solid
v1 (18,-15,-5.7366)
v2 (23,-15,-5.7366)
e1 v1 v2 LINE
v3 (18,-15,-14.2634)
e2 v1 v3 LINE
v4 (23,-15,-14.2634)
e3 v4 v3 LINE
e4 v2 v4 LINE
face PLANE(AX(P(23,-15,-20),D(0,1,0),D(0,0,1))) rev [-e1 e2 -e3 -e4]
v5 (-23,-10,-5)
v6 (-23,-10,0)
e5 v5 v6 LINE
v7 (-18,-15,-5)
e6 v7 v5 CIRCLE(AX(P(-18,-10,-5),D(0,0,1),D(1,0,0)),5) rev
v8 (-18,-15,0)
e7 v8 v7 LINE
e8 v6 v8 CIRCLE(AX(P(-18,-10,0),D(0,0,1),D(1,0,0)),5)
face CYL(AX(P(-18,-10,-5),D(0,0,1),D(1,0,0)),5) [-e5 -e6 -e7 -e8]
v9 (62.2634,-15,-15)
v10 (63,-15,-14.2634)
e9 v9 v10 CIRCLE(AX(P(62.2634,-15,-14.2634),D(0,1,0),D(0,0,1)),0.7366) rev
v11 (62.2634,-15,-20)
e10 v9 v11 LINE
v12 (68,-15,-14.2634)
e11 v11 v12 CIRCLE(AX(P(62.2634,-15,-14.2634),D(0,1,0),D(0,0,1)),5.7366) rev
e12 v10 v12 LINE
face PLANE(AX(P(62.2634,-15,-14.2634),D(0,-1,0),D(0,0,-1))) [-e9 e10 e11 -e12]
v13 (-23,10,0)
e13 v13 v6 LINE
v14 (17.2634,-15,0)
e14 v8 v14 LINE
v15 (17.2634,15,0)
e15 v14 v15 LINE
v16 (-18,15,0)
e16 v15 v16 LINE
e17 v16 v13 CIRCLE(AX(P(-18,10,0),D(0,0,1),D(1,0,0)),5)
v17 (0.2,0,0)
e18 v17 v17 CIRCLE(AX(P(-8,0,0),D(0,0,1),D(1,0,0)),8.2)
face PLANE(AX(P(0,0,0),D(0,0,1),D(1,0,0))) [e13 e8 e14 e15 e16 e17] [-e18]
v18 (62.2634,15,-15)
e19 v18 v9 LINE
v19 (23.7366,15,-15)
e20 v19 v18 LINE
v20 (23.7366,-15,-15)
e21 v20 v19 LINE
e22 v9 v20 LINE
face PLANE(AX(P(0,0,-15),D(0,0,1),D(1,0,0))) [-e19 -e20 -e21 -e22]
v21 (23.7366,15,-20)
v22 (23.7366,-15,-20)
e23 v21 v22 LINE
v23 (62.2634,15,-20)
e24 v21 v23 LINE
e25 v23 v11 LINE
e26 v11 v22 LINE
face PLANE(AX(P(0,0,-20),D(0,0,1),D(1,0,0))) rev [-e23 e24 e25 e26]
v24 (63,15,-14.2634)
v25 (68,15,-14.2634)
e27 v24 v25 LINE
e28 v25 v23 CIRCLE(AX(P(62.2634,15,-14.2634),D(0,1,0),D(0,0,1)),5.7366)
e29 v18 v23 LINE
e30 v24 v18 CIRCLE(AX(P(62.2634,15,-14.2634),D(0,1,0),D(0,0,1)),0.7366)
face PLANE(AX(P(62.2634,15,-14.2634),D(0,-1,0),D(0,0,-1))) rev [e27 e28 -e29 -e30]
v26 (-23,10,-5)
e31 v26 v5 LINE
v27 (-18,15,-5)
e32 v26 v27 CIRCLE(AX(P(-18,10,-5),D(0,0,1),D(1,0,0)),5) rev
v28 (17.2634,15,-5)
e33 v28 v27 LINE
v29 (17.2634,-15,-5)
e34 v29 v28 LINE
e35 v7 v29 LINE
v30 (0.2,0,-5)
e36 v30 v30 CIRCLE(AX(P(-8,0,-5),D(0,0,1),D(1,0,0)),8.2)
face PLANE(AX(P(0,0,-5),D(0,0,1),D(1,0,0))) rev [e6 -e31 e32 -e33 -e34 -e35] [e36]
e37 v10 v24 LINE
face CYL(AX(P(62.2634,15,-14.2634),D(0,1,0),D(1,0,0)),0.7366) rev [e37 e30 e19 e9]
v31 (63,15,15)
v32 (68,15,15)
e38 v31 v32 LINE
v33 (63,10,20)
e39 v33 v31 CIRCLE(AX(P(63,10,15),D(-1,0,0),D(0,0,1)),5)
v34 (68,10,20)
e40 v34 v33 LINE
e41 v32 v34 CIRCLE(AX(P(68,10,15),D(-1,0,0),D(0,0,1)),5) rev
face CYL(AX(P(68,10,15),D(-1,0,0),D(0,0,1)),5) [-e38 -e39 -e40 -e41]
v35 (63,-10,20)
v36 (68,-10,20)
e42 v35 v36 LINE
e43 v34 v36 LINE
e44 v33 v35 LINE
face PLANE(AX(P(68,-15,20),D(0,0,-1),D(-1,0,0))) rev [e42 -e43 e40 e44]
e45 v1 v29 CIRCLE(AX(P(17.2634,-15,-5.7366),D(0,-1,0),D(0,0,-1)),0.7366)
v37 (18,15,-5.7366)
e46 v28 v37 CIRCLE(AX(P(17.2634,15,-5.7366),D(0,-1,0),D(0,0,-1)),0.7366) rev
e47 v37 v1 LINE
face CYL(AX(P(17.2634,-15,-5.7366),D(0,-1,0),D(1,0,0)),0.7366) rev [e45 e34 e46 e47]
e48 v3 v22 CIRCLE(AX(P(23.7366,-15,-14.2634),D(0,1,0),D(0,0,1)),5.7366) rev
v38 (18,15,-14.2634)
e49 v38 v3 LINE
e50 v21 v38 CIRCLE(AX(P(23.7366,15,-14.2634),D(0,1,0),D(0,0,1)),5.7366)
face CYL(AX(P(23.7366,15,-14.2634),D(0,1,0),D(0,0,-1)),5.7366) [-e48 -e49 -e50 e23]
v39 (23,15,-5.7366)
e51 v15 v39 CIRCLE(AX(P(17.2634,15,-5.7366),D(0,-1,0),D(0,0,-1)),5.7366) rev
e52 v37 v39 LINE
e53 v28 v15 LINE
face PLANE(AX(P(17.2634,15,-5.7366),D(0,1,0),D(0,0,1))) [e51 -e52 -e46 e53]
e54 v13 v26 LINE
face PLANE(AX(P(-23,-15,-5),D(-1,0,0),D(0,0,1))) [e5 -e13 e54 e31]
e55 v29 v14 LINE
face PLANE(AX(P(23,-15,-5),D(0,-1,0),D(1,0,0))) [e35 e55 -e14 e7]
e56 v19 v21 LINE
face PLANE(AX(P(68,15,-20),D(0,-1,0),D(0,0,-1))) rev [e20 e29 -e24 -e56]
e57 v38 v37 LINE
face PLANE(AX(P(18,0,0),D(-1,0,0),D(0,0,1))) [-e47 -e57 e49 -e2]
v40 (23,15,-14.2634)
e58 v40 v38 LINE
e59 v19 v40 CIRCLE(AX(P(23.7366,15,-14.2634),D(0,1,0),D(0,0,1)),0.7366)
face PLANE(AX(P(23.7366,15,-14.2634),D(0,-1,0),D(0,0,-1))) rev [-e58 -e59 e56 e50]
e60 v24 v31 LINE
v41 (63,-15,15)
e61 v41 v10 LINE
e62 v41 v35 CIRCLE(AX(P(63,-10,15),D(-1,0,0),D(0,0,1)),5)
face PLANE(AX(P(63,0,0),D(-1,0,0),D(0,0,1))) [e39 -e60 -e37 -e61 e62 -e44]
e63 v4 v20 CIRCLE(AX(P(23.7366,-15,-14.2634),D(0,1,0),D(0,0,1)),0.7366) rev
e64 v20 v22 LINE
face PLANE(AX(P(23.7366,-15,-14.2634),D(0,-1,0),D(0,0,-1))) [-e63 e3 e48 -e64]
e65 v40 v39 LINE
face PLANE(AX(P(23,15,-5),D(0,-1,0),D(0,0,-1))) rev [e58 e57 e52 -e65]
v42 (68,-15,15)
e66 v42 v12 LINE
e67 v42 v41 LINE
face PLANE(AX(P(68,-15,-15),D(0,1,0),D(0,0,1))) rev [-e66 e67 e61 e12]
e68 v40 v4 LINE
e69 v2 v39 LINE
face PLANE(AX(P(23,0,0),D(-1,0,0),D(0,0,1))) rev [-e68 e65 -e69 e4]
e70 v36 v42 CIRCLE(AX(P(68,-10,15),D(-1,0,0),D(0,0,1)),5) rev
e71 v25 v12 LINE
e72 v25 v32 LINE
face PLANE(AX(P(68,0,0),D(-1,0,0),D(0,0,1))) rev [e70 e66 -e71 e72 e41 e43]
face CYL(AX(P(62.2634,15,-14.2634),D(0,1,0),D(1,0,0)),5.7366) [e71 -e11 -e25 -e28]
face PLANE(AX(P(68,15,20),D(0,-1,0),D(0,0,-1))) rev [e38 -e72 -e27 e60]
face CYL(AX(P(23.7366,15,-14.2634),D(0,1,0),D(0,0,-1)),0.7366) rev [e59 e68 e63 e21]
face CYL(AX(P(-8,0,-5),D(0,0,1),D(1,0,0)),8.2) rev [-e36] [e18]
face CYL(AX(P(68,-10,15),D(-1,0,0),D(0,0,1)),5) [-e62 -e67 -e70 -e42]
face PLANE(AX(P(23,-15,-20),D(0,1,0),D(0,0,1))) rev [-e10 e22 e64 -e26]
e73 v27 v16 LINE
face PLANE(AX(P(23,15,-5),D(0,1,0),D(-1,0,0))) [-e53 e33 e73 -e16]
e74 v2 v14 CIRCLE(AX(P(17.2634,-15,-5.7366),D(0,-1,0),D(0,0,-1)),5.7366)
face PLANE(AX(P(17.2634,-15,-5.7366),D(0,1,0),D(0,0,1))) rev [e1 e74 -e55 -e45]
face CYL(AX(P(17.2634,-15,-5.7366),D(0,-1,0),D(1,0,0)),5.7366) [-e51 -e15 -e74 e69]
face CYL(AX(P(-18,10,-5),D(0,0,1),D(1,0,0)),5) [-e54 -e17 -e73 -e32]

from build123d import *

# Parameters (mm, degrees)
SZKIC1_W                           = 46
SZKIC1_H                           = 30
SZKIC1_R                           = 8.2
ODGI_CIE_BAZOWE1_DEPTH             = 5
ODGI_CIE_KRAW_DZI1_STRIP_W         = 21.4732
ODGI_CIE_KRAW_DZI1_STRIP_H         = 5
ODGI_CIE_KRAW_DZI1_STRIP_CUT_DEPTH = 30
ODGI_CIE_KRAW_DZI1_DEPTH           = 30
ODGI_CIE_KRAW_DZI2_STRIP_W         = 21.4732
ODGI_CIE_KRAW_DZI2_STRIP_H         = 5
ODGI_CIE_KRAW_DZI2_STRIP_CUT_DEPTH = 30
ODGI_CIE_KRAW_DZI2_DEPTH           = 30
ODGI_CIE_KRAW_DZI3_STRIP_W         = 21.4732
ODGI_CIE_KRAW_DZI3_STRIP_H         = 5
ODGI_CIE_KRAW_DZI3_STRIP_CUT_DEPTH = 30
ODGI_CIE_KRAW_DZI3_DEPTH           = 30
OD_AM_START                        = 63
OD_AM_NARO_NIK1_DEPTH              = 5
OD_AM_START_2                      = -5
OD_AM_NARO_NIK1_2_DEPTH            = 5


# Read off the part's stored shape, not the designer's step: Odłam narożnik1
# Sheet-metal steps are written as plain solids
with BuildPart() as part:
    # Szkic1 → Odgięcie bazowe1 (new body)
    with BuildSketch(Plane.XY):
        Rectangle(SZKIC1_W, SZKIC1_H)
        with Locations((-8, 0)):
            Circle(SZKIC1_R, mode=Mode.SUBTRACT)
    extrude(amount=-ODGI_CIE_BAZOWE1_DEPTH)

    # Odgięcie krawędzi1 strip (across the edge) → Odgięcie krawędzi1 strip cut (cut)
    with BuildSketch(Plane(origin=(23, 15, -5), x_dir=(-1, 0, 0), z_dir=(0, -1, 0))):
        with Locations((-5, -2.5)):
            Rectangle(ODGI_CIE_KRAW_DZI1_STRIP_W, ODGI_CIE_KRAW_DZI1_STRIP_H)
    extrude(amount=ODGI_CIE_KRAW_DZI1_STRIP_CUT_DEPTH, mode=Mode.SUBTRACT)

    # Odgięcie krawędzi1 section (across the edge) → Odgięcie krawędzi1 (add)
    with BuildSketch(Plane(origin=(23, 15, -5), x_dir=(-1, 0, 0), z_dir=(0, -1, 0))):
        with BuildLine():
            Line((0, 0.7366), (0, 15))
            Line((0, 15), (5, 15))
            Line((5, 15), (5, 0.7366))
            ThreePointArc((5, 0.7366), (5.215745145, 0.215745145), (5.7366, 0))
            Line((5.7366, 0), (5.7366, -5))
            ThreePointArc((5.7366, -5), (1.680211239, -3.319788761), (0, 0.7366))
        make_face()
    extrude(amount=ODGI_CIE_KRAW_DZI1_DEPTH)

    # Odgięcie krawędzi2 strip (across the edge) → Odgięcie krawędzi2 strip cut (cut)
    with BuildSketch(Plane(origin=(23, -15, -20), x_dir=(0, 0, 1), z_dir=(0, 1, 0))):
        with Locations((-5, -2.5)):
            Rectangle(ODGI_CIE_KRAW_DZI2_STRIP_W, ODGI_CIE_KRAW_DZI2_STRIP_H)
    extrude(amount=ODGI_CIE_KRAW_DZI2_STRIP_CUT_DEPTH, mode=Mode.SUBTRACT)

    # Odgięcie krawędzi2 section (across the edge) → Odgięcie krawędzi2 (add)
    with BuildSketch(Plane(origin=(23, -15, -20), x_dir=(0, 0, 1), z_dir=(0, 1, 0))):
        with BuildLine():
            Line((0, 0.7366), (0, 45))
            Line((0, 45), (5, 45))
            Line((5, 45), (5, 0.7366))
            ThreePointArc((5, 0.7366), (5.215745145, 0.215745145), (5.7366, 0))
            Line((5.7366, 0), (5.7366, -5))
            ThreePointArc((5.7366, -5), (1.680211239, -3.319788761), (0, 0.7366))
        make_face()
    extrude(amount=ODGI_CIE_KRAW_DZI2_DEPTH)

    # Odgięcie krawędzi3 strip (across the edge) → Odgięcie krawędzi3 strip cut (cut)
    with BuildSketch(Plane(origin=(68, -15, -15), x_dir=(-1, 0, 0), z_dir=(0, 1, 0))):
        with Locations((-5, -2.5)):
            Rectangle(ODGI_CIE_KRAW_DZI3_STRIP_W, ODGI_CIE_KRAW_DZI3_STRIP_H)
    extrude(amount=ODGI_CIE_KRAW_DZI3_STRIP_CUT_DEPTH, mode=Mode.SUBTRACT)

    # Odgięcie krawędzi3 section (across the edge) → Odgięcie krawędzi3 (add)
    with BuildSketch(Plane(origin=(68, -15, -15), x_dir=(-1, 0, 0), z_dir=(0, 1, 0))):
        with BuildLine():
            Line((0, 0.7366), (0, 35))
            Line((0, 35), (5, 35))
            Line((5, 35), (5, 0.7366))
            ThreePointArc((5, 0.7366), (5.215745145, 0.215745145), (5.7366, 0))
            Line((5.7366, 0), (5.7366, -5))
            ThreePointArc((5.7366, -5), (1.680211239, -3.319788761), (0, 0.7366))
        make_face()
    extrude(amount=ODGI_CIE_KRAW_DZI3_DEPTH)

    # Odłam narożnik1 outline → Odłam narożnik1 (cut)
    with BuildSketch(Plane.YZ.offset(OD_AM_START)):
        with BuildLine():
            Line((-15, 20), (-15, 15))
            ThreePointArc((-15, 15), (-13.535533906, 18.535533906), (-10, 20))
            Line((-10, 20), (-15, 20))
        make_face()
        with BuildLine():
            Line((15, 20), (10, 20))
            ThreePointArc((10, 20), (13.535533906, 18.535533906), (15, 15))
            Line((15, 15), (15, 20))
        make_face()
    extrude(amount=OD_AM_NARO_NIK1_DEPTH, mode=Mode.SUBTRACT)

    # Od_am naro_nik1 2 outline → Od_am naro_nik1 2 (cut)
    with BuildSketch(Plane.XY.offset(OD_AM_START_2)):
        with BuildLine():
            ThreePointArc((-18, -15), (-21.535533906, -13.535533906), (-23, -10))
            Line((-23, -10), (-23, -15))
            Line((-23, -15), (-18, -15))
        make_face()
        with BuildLine():
            ThreePointArc((-23, 10), (-21.535533906, 13.535533906), (-18, 15))
            Line((-18, 15), (-23, 15))
            Line((-23, 15), (-23, 10))
        make_face()
    extrude(amount=OD_AM_NARO_NIK1_2_DEPTH, mode=Mode.SUBTRACT)


solid = part.part
